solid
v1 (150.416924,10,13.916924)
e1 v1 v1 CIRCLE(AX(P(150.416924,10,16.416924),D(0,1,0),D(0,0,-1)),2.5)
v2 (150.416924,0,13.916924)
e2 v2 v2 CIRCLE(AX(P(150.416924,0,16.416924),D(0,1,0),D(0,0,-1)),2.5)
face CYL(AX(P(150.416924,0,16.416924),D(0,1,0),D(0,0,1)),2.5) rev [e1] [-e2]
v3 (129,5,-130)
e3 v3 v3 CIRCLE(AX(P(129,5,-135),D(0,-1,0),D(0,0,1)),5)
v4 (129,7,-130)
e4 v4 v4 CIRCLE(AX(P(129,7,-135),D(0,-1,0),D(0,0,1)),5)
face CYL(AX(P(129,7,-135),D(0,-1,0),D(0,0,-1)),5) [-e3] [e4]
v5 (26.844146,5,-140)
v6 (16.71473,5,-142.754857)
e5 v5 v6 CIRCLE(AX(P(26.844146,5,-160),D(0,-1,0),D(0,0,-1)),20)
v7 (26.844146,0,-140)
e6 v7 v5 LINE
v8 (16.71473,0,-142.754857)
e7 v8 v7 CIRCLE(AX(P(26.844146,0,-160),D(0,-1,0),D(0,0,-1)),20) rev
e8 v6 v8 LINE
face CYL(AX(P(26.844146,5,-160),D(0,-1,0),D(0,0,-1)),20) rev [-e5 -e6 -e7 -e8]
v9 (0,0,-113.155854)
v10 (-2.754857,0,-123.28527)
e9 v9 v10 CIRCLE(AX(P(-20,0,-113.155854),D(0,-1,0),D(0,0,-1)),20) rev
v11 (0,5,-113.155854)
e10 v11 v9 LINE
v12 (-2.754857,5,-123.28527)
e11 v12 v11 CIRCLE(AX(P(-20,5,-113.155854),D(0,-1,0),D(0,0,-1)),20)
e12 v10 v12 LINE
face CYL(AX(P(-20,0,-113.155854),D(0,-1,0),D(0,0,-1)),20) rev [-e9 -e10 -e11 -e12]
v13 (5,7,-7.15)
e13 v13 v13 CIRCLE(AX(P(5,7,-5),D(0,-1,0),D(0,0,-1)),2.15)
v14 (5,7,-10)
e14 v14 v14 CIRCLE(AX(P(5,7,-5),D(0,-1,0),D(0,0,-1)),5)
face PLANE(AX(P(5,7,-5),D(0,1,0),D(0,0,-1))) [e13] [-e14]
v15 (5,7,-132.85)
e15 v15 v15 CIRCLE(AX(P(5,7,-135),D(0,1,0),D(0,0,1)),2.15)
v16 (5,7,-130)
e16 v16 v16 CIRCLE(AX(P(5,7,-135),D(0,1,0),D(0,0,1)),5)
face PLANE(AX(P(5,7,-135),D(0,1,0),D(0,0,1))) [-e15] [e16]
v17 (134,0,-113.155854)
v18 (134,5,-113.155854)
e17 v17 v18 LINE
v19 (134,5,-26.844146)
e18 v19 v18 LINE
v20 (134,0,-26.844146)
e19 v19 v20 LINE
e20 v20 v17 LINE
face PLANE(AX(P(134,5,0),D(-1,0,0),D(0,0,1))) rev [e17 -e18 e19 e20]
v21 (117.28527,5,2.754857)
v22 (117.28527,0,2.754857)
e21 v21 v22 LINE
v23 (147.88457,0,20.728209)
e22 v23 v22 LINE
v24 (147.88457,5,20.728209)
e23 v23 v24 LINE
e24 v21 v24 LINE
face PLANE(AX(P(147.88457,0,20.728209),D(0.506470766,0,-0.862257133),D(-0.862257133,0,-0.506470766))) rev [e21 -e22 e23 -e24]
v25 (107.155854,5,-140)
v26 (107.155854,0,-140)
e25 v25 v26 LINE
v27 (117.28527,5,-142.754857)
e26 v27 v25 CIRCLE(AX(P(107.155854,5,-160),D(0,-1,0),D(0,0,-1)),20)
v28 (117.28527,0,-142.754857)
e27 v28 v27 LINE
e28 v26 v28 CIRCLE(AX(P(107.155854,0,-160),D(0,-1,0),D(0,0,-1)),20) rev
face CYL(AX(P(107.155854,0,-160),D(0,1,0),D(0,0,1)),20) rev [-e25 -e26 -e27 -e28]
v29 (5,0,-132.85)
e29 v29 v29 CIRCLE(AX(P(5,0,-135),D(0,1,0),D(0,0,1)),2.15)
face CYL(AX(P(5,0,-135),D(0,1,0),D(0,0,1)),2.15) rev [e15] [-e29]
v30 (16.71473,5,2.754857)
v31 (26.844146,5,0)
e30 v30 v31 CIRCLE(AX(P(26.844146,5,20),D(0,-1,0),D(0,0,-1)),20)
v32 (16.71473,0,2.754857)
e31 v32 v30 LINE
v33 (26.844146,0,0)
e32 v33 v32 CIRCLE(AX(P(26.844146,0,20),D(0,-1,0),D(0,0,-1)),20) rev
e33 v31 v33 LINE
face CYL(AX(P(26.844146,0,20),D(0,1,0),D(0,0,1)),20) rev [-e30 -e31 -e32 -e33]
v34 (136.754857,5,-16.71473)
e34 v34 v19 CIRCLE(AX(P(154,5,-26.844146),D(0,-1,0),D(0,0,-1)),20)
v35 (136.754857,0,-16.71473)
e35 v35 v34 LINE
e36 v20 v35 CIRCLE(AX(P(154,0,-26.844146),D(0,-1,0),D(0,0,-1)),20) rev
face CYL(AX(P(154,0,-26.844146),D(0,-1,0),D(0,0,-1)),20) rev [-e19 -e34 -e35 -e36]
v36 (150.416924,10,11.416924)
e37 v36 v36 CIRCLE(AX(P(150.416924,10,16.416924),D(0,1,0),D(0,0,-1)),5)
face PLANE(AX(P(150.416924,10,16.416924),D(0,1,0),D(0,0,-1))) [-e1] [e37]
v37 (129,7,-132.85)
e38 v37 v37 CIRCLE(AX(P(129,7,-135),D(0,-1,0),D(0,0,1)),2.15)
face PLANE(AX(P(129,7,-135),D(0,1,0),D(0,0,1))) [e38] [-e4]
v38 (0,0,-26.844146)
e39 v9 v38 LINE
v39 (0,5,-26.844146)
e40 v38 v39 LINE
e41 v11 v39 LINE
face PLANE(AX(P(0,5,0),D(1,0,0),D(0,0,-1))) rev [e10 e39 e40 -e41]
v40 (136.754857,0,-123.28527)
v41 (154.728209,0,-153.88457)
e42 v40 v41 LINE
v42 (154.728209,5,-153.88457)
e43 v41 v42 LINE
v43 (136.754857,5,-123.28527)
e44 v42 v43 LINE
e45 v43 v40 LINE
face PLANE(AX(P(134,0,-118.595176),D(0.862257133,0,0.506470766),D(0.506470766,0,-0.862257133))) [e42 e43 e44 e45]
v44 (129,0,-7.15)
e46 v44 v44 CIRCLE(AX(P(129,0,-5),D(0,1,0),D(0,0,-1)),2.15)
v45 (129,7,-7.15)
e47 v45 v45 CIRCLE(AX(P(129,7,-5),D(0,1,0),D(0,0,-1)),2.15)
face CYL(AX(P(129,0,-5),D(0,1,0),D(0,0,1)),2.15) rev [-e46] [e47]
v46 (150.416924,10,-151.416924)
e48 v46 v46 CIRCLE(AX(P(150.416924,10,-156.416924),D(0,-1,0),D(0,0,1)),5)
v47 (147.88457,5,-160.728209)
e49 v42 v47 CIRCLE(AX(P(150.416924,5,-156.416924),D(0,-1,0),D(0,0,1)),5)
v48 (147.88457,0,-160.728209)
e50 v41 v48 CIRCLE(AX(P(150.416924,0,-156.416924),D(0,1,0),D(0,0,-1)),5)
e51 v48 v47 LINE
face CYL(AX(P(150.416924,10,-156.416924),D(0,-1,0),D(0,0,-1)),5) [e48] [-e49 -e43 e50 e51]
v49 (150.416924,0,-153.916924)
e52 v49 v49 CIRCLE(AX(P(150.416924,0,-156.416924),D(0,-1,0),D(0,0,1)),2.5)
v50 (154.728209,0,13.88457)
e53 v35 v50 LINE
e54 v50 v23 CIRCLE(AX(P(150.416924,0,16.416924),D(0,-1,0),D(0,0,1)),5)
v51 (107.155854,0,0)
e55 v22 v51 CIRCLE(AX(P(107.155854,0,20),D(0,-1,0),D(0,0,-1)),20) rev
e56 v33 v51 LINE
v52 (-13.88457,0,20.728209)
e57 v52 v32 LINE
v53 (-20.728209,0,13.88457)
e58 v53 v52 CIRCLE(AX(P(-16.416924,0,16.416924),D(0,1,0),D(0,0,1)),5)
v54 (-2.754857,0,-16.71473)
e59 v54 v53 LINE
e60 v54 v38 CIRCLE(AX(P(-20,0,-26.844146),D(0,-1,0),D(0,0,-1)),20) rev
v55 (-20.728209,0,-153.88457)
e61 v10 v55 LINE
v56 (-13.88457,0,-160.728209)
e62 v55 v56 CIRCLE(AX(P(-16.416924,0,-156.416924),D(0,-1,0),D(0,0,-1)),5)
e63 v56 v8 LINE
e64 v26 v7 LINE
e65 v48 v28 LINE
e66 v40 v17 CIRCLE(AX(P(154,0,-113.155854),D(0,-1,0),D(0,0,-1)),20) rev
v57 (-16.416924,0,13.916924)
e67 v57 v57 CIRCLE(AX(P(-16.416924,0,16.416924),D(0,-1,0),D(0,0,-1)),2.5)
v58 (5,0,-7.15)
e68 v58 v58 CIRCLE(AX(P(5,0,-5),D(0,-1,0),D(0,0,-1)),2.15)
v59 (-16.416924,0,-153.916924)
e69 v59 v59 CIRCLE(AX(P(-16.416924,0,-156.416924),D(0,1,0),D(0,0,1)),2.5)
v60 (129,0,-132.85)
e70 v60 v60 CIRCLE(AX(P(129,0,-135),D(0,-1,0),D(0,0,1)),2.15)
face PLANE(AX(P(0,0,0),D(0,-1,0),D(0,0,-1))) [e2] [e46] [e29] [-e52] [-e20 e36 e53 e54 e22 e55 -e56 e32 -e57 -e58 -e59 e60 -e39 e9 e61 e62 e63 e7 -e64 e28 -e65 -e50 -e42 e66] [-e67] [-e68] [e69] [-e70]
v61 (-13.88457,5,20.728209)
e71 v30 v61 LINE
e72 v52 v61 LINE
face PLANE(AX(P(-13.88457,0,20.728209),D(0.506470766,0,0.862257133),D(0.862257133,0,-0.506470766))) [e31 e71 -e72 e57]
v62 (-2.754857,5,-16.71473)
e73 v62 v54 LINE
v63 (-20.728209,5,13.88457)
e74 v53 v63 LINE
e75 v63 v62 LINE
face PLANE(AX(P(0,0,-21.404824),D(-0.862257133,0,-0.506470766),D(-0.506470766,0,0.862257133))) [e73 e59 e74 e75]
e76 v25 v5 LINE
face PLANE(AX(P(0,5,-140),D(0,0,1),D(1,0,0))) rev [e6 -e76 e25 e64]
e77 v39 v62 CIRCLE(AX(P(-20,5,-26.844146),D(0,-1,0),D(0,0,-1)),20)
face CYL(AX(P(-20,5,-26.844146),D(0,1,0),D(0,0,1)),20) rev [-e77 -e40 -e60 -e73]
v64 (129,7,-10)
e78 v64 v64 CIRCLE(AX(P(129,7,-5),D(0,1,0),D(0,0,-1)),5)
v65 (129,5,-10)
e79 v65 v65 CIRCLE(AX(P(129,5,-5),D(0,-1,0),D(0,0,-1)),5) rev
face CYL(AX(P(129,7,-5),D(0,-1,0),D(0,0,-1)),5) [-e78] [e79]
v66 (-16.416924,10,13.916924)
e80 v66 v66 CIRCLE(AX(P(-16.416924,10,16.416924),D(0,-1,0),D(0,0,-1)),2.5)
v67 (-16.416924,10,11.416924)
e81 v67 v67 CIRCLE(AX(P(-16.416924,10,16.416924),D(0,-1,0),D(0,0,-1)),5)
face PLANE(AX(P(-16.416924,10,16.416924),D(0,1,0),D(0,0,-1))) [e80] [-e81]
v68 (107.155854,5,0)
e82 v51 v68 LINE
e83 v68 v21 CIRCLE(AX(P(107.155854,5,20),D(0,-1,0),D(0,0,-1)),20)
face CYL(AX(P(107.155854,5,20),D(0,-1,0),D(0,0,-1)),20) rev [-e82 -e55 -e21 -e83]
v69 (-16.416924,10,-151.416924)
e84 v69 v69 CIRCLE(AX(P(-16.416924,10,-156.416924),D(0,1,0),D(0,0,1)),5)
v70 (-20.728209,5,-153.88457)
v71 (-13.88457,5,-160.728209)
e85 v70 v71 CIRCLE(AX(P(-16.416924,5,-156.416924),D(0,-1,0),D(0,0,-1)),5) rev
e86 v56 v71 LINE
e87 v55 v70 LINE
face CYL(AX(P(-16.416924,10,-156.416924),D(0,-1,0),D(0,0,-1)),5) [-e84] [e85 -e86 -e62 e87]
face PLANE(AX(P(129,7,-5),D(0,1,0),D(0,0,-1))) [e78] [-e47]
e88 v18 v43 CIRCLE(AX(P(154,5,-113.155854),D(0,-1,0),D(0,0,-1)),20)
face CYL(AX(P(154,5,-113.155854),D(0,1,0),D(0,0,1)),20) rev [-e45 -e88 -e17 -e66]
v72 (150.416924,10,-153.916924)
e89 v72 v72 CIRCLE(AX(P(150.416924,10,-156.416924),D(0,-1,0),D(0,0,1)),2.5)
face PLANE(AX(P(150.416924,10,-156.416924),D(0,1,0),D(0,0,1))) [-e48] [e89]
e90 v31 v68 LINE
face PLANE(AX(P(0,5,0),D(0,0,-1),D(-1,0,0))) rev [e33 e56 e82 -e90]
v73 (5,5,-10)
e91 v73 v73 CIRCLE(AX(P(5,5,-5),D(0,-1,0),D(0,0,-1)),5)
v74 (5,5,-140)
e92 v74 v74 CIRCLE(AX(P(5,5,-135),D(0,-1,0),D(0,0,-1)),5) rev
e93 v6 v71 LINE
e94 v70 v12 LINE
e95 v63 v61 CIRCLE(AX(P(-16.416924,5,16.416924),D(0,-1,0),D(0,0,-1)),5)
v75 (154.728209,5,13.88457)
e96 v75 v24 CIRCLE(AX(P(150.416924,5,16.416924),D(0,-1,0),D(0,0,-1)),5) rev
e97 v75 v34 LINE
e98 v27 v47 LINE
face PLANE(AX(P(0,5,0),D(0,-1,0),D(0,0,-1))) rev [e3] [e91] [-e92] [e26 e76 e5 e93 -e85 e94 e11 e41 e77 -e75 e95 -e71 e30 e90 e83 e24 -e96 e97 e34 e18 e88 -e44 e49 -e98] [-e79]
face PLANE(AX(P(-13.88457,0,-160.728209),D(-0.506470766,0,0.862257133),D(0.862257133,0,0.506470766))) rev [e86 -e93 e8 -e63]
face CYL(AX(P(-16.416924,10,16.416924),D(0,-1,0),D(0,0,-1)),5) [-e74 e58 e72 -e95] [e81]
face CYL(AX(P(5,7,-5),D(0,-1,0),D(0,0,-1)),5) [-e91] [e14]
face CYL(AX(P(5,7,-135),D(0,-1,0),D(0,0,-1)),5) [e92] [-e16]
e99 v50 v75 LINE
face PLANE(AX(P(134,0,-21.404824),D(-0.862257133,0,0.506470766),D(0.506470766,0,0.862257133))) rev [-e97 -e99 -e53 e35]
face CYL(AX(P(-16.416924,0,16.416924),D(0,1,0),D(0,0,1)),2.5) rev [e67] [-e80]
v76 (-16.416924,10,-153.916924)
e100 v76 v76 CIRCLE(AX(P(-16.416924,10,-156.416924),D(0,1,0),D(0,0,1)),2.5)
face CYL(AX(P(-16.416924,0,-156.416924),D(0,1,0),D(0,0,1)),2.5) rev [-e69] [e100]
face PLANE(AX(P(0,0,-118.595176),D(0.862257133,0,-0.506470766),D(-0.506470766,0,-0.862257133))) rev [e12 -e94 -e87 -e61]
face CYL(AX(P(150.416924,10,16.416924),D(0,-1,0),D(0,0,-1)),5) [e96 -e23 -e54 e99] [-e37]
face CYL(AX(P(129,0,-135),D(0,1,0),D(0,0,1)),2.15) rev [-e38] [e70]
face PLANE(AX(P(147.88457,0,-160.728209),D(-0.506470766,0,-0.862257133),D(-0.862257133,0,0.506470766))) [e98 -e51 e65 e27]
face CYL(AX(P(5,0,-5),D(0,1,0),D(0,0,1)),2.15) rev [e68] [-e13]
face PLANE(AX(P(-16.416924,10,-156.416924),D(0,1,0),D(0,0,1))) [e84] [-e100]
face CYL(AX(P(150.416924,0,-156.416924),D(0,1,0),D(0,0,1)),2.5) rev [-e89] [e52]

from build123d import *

# Parameters (mm, degrees)
SKETCH1_W                                  = 134
SKETCH1_H                                  = 140
BOSS_EXTRUDE1_DEPTH                        = 5
BOSS_EXTRUDE3_DEPTH                        = 5
SKETCH3_R                                  = 5
BOSS_EXTRUDE4_DEPTH                        = 5
HOLE1_OUTLINE_R                            = 2.5
HOLE1_DEPTH                                = 10
SKETCH6_R                                  = 5
BOSS_EXTRUDE5_DEPTH                        = 2
HOLE2_OUTLINE_R                            = 2.15
HOLE2_DEPTH                                = 7
MIRROR1_AT_THE_SECOND_PLANE_COPY_1_DEPTH   = 5
MIRROR1_AT_THE_SECOND_PLANE_COPY_2_SKETC_R = 5
MIRROR1_AT_THE_SECOND_PLANE_COPY_2_DEPTH   = 5
MIRROR1_AT_THE_SECOND_PLANE_COPY_3_SKETC_R = 2.5
MIRROR1_AT_THE_SECOND_PLANE_COPY_3_DEPTH   = 10
MIRROR1_AT_THE_SECOND_PLANE_COPY_4_SKETC_R = 5
MIRROR1_AT_THE_SECOND_PLANE_COPY_4_DEPTH   = 2
MIRROR1_AT_THE_SECOND_PLANE_COPY_5_SKETC_R = 2.15
MIRROR1_AT_THE_SECOND_PLANE_COPY_5_DEPTH   = 7
CUT_EXTRUDE_THIN1_DEPTH                    = 232.199441913
MIRROR2_AT_THE_SECOND_PLANE_COPY_1_DEPTH   = 232.199441913
FILLET1_R                                  = 20


# Read off the part's stored shape, not the designer's step: Hole1, Hole2
with BuildPart() as part:
    # Sketch1 → Boss-Extrude1 (new body)
    with BuildSketch(Plane(origin=(0, 0, 0), x_dir=(1, 0, 0), z_dir=(0, 1, 0))):
        with Locations((67, 70)):
            Rectangle(SKETCH1_W, SKETCH1_H)
    extrude(amount=BOSS_EXTRUDE1_DEPTH)

    # Sketch2 → Boss-Extrude3 (add)
    with BuildSketch(Plane(origin=(0, 5, 0), x_dir=(1, 0, 0), z_dir=(0, 1, 0))):
        with BuildLine():
            Line((0, 118.595175856), (-24.35045716, 150.329309467))
            ThreePointArc((-24.35045716, 150.329309467), (-23.487991569, 163.487991569), (-10.329309467, 164.35045716))
            Line((-10.329309467, 164.35045716), (21.404824144, 140))
            Line((21.404824144, 140), (0, 140))
            Line((0, 140), (0, 118.595175856))
        make_face()
    boss_extrude3 = extrude(amount=-BOSS_EXTRUDE3_DEPTH)

    # Sketch3 → Boss-Extrude4 (add)
    with BuildSketch(Plane(origin=(0, 5, 0), x_dir=(1, 0, 0), z_dir=(0, 1, 0))):
        with Locations(Location((-16.416923757, 156.416923757, 0), (0, 0, 90))):
            Circle(SKETCH3_R)
    boss_extrude4 = extrude(amount=BOSS_EXTRUDE4_DEPTH)

    # Hole1 outline → Hole1 (cut)
    with BuildSketch(Plane(origin=(0, 0, 0), x_dir=(1, 0, 0), z_dir=(0, 1, 0))):
        with Locations((-16.416923757, 156.416923757)):
            Circle(HOLE1_OUTLINE_R)
    hole1 = extrude(amount=HOLE1_DEPTH, mode=Mode.SUBTRACT)

    # Sketch6 → Boss-Extrude5 (add)
    with BuildSketch(Plane(origin=(0, 5, 0), x_dir=(1, 0, 0), z_dir=(0, 1, 0))):
        with Locations(Location((5, 135, 0), (0, 0, 90))):
            Circle(SKETCH6_R)
    boss_extrude5 = extrude(amount=BOSS_EXTRUDE5_DEPTH)

    # Hole2 outline → Hole2 (cut)
    with BuildSketch(Plane(origin=(0, 0, 0), x_dir=(1, 0, 0), z_dir=(0, 1, 0))):
        with Locations((5, 135)):
            Circle(HOLE2_OUTLINE_R)
    hole2 = extrude(amount=HOLE2_DEPTH, mode=Mode.SUBTRACT)

    # Mirror1: Boss-Extrude3, Boss-Extrude4, Hole1, Boss-Extrude5, Hole2 across plane
    add(boss_extrude3.mirror(Plane.XY.offset(-70)))
    add(boss_extrude4.mirror(Plane.XY.offset(-70)))
    add(hole1.mirror(Plane.XY.offset(-70)), mode=Mode.SUBTRACT)
    add(boss_extrude5.mirror(Plane.XY.offset(-70)))
    add(hole2.mirror(Plane.XY.offset(-70)), mode=Mode.SUBTRACT)

    # Mirror1 at the second plane: Boss-Extrude3, Boss-Extrude4, Hole1, Boss-Extrude5, Hole2 across plane
    add(boss_extrude3.mirror(Plane.ZY.offset(-67)))
    add(boss_extrude4.mirror(Plane.ZY.offset(-67)))
    add(hole1.mirror(Plane.ZY.offset(-67)), mode=Mode.SUBTRACT)
    add(boss_extrude5.mirror(Plane.ZY.offset(-67)))
    add(hole2.mirror(Plane.ZY.offset(-67)), mode=Mode.SUBTRACT)

    # Mirror1 at the second plane copy 1 sketc → Mirror1 at the second plane copy 1 (add)
    with BuildSketch(Plane(origin=(134, 5, -140), x_dir=(-1, 0, 0), z_dir=(0, 1, 0))):
        with BuildLine():
            Line((0, 118.595175856), (-24.35045716, 150.329309467))
            ThreePointArc((-24.35045716, 150.329309467), (-23.487991569, 163.487991569), (-10.329309467, 164.35045716))
            Line((-10.329309467, 164.35045716), (21.404824144, 140))
            Line((21.404824144, 140), (0, 140))
            Line((0, 140), (0, 118.595175856))
        make_face()
    extrude(amount=-MIRROR1_AT_THE_SECOND_PLANE_COPY_1_DEPTH)

    # Mirror1 at the second plane copy 2 sketc → Mirror1 at the second plane copy 2 (add)
    with BuildSketch(Plane(origin=(134, 5, -140), x_dir=(-1, 0, 0), z_dir=(0, 1, 0))):
        with Locations(Location((-16.416923757, 156.416923757, 0), (0, 0, 90))):
            Circle(MIRROR1_AT_THE_SECOND_PLANE_COPY_2_SKETC_R)
    extrude(amount=MIRROR1_AT_THE_SECOND_PLANE_COPY_2_DEPTH)

    # Mirror1 at the second plane copy 3 sketc → Mirror1 at the second plane copy 3 (cut)
    with BuildSketch(Plane(origin=(134, 0, -140), x_dir=(-1, 0, 0), z_dir=(0, 1, 0))):
        with Locations((-16.416923757, 156.416923757)):
            Circle(MIRROR1_AT_THE_SECOND_PLANE_COPY_3_SKETC_R)
    extrude(amount=MIRROR1_AT_THE_SECOND_PLANE_COPY_3_DEPTH, mode=Mode.SUBTRACT)

    # Mirror1 at the second plane copy 4 sketc → Mirror1 at the second plane copy 4 (add)
    with BuildSketch(Plane(origin=(134, 5, -140), x_dir=(-1, 0, 0), z_dir=(0, 1, 0))):
        with Locations(Location((5, 135, 0), (0, 0, 90))):
            Circle(MIRROR1_AT_THE_SECOND_PLANE_COPY_4_SKETC_R)
    extrude(amount=MIRROR1_AT_THE_SECOND_PLANE_COPY_4_DEPTH)

    # Mirror1 at the second plane copy 5 sketc → Mirror1 at the second plane copy 5 (cut)
    with BuildSketch(Plane(origin=(134, 0, -140), x_dir=(-1, 0, 0), z_dir=(0, 1, 0))):
        with Locations((5, 135)):
            Circle(MIRROR1_AT_THE_SECOND_PLANE_COPY_5_SKETC_R)
    extrude(amount=MIRROR1_AT_THE_SECOND_PLANE_COPY_5_DEPTH, mode=Mode.SUBTRACT)

    # Sketch9 → Cut-Extrude-Thin1 (cut, symmetric)
    with BuildSketch(Plane(origin=(0, 5, 0), x_dir=(1, 0, 0), z_dir=(0, 1, 0))):
        with BuildLine():
            Line((0, 118.595175856), (-20.728209423, 153.88456993))
            ThreePointArc((-20.728209423, 153.88456993), (-19.952457663, 159.952457663), (-13.88456993, 160.728209423))
            Line((-13.88456993, 160.728209423), (21.404824144, 140))
            Line((21.404824144, 140), (26.4695318, 148.622571331))
            Line((26.4695318, 148.622571331), (-8.819862274, 169.350780755))
            ThreePointArc((-8.819862274, 169.350780755), (-27.023525475, 167.023525475), (-29.350780755, 148.819862274))
            Line((-29.350780755, 148.819862274), (-8.622571331, 113.5304682))
            Line((-8.622571331, 113.5304682), (0, 118.595175856))
        make_face()
    cut_extrude_thin1 = extrude(amount=CUT_EXTRUDE_THIN1_DEPTH, both=True, mode=Mode.SUBTRACT)

    # Mirror2: Cut-Extrude-Thin1 across plane
    add(cut_extrude_thin1.mirror(Plane.ZY.offset(-67)), mode=Mode.SUBTRACT)

    # Mirror2 at the second plane: Cut-Extrude-Thin1 across plane
    add(cut_extrude_thin1.mirror(Plane.XY.offset(-70)), mode=Mode.SUBTRACT)

    # Mirror2 at the second plane copy 1 sketc → Mirror2 at the second plane copy 1 (cut, symmetric)
    with BuildSketch(Plane(origin=(134, 5, -140), x_dir=(-1, 0, 0), z_dir=(0, 1, 0))):
        with BuildLine():
            Line((0, 118.595175856), (-20.728209423, 153.88456993))
            ThreePointArc((-20.728209423, 153.88456993), (-19.952457663, 159.952457663), (-13.88456993, 160.728209423))
            Line((-13.88456993, 160.728209423), (21.404824144, 140))
            Line((21.404824144, 140), (26.4695318, 148.622571331))
            Line((26.4695318, 148.622571331), (-8.819862274, 169.350780755))
            ThreePointArc((-8.819862274, 169.350780755), (-27.023525475, 167.023525475), (-29.350780755, 148.819862274))
            Line((-29.350780755, 148.819862274), (-8.622571331, 113.5304682))
            Line((-8.622571331, 113.5304682), (0, 118.595175856))
        make_face()
    extrude(amount=MIRROR2_AT_THE_SECOND_PLANE_COPY_1_DEPTH, both=True, mode=Mode.SUBTRACT)

    # Fillet1
    fillet1_edges = [part.edges().sort_by_distance(p)[0] for p in [
        (0, 2.5, -118.595175856),
        (21.404824144, 2.5, -140),
        (112.595175856, 2.5, -140),
        (134, 2.5, -118.595175856),
        (21.404824144, 2.5, 0),
        (0, 2.5, -21.404824144),
        (134, 2.5, -21.404824144),
        (112.595175856, 2.5, 0),
    ]]
    fillet(fillet1_edges, radius=FILLET1_R)


solid = part.part
